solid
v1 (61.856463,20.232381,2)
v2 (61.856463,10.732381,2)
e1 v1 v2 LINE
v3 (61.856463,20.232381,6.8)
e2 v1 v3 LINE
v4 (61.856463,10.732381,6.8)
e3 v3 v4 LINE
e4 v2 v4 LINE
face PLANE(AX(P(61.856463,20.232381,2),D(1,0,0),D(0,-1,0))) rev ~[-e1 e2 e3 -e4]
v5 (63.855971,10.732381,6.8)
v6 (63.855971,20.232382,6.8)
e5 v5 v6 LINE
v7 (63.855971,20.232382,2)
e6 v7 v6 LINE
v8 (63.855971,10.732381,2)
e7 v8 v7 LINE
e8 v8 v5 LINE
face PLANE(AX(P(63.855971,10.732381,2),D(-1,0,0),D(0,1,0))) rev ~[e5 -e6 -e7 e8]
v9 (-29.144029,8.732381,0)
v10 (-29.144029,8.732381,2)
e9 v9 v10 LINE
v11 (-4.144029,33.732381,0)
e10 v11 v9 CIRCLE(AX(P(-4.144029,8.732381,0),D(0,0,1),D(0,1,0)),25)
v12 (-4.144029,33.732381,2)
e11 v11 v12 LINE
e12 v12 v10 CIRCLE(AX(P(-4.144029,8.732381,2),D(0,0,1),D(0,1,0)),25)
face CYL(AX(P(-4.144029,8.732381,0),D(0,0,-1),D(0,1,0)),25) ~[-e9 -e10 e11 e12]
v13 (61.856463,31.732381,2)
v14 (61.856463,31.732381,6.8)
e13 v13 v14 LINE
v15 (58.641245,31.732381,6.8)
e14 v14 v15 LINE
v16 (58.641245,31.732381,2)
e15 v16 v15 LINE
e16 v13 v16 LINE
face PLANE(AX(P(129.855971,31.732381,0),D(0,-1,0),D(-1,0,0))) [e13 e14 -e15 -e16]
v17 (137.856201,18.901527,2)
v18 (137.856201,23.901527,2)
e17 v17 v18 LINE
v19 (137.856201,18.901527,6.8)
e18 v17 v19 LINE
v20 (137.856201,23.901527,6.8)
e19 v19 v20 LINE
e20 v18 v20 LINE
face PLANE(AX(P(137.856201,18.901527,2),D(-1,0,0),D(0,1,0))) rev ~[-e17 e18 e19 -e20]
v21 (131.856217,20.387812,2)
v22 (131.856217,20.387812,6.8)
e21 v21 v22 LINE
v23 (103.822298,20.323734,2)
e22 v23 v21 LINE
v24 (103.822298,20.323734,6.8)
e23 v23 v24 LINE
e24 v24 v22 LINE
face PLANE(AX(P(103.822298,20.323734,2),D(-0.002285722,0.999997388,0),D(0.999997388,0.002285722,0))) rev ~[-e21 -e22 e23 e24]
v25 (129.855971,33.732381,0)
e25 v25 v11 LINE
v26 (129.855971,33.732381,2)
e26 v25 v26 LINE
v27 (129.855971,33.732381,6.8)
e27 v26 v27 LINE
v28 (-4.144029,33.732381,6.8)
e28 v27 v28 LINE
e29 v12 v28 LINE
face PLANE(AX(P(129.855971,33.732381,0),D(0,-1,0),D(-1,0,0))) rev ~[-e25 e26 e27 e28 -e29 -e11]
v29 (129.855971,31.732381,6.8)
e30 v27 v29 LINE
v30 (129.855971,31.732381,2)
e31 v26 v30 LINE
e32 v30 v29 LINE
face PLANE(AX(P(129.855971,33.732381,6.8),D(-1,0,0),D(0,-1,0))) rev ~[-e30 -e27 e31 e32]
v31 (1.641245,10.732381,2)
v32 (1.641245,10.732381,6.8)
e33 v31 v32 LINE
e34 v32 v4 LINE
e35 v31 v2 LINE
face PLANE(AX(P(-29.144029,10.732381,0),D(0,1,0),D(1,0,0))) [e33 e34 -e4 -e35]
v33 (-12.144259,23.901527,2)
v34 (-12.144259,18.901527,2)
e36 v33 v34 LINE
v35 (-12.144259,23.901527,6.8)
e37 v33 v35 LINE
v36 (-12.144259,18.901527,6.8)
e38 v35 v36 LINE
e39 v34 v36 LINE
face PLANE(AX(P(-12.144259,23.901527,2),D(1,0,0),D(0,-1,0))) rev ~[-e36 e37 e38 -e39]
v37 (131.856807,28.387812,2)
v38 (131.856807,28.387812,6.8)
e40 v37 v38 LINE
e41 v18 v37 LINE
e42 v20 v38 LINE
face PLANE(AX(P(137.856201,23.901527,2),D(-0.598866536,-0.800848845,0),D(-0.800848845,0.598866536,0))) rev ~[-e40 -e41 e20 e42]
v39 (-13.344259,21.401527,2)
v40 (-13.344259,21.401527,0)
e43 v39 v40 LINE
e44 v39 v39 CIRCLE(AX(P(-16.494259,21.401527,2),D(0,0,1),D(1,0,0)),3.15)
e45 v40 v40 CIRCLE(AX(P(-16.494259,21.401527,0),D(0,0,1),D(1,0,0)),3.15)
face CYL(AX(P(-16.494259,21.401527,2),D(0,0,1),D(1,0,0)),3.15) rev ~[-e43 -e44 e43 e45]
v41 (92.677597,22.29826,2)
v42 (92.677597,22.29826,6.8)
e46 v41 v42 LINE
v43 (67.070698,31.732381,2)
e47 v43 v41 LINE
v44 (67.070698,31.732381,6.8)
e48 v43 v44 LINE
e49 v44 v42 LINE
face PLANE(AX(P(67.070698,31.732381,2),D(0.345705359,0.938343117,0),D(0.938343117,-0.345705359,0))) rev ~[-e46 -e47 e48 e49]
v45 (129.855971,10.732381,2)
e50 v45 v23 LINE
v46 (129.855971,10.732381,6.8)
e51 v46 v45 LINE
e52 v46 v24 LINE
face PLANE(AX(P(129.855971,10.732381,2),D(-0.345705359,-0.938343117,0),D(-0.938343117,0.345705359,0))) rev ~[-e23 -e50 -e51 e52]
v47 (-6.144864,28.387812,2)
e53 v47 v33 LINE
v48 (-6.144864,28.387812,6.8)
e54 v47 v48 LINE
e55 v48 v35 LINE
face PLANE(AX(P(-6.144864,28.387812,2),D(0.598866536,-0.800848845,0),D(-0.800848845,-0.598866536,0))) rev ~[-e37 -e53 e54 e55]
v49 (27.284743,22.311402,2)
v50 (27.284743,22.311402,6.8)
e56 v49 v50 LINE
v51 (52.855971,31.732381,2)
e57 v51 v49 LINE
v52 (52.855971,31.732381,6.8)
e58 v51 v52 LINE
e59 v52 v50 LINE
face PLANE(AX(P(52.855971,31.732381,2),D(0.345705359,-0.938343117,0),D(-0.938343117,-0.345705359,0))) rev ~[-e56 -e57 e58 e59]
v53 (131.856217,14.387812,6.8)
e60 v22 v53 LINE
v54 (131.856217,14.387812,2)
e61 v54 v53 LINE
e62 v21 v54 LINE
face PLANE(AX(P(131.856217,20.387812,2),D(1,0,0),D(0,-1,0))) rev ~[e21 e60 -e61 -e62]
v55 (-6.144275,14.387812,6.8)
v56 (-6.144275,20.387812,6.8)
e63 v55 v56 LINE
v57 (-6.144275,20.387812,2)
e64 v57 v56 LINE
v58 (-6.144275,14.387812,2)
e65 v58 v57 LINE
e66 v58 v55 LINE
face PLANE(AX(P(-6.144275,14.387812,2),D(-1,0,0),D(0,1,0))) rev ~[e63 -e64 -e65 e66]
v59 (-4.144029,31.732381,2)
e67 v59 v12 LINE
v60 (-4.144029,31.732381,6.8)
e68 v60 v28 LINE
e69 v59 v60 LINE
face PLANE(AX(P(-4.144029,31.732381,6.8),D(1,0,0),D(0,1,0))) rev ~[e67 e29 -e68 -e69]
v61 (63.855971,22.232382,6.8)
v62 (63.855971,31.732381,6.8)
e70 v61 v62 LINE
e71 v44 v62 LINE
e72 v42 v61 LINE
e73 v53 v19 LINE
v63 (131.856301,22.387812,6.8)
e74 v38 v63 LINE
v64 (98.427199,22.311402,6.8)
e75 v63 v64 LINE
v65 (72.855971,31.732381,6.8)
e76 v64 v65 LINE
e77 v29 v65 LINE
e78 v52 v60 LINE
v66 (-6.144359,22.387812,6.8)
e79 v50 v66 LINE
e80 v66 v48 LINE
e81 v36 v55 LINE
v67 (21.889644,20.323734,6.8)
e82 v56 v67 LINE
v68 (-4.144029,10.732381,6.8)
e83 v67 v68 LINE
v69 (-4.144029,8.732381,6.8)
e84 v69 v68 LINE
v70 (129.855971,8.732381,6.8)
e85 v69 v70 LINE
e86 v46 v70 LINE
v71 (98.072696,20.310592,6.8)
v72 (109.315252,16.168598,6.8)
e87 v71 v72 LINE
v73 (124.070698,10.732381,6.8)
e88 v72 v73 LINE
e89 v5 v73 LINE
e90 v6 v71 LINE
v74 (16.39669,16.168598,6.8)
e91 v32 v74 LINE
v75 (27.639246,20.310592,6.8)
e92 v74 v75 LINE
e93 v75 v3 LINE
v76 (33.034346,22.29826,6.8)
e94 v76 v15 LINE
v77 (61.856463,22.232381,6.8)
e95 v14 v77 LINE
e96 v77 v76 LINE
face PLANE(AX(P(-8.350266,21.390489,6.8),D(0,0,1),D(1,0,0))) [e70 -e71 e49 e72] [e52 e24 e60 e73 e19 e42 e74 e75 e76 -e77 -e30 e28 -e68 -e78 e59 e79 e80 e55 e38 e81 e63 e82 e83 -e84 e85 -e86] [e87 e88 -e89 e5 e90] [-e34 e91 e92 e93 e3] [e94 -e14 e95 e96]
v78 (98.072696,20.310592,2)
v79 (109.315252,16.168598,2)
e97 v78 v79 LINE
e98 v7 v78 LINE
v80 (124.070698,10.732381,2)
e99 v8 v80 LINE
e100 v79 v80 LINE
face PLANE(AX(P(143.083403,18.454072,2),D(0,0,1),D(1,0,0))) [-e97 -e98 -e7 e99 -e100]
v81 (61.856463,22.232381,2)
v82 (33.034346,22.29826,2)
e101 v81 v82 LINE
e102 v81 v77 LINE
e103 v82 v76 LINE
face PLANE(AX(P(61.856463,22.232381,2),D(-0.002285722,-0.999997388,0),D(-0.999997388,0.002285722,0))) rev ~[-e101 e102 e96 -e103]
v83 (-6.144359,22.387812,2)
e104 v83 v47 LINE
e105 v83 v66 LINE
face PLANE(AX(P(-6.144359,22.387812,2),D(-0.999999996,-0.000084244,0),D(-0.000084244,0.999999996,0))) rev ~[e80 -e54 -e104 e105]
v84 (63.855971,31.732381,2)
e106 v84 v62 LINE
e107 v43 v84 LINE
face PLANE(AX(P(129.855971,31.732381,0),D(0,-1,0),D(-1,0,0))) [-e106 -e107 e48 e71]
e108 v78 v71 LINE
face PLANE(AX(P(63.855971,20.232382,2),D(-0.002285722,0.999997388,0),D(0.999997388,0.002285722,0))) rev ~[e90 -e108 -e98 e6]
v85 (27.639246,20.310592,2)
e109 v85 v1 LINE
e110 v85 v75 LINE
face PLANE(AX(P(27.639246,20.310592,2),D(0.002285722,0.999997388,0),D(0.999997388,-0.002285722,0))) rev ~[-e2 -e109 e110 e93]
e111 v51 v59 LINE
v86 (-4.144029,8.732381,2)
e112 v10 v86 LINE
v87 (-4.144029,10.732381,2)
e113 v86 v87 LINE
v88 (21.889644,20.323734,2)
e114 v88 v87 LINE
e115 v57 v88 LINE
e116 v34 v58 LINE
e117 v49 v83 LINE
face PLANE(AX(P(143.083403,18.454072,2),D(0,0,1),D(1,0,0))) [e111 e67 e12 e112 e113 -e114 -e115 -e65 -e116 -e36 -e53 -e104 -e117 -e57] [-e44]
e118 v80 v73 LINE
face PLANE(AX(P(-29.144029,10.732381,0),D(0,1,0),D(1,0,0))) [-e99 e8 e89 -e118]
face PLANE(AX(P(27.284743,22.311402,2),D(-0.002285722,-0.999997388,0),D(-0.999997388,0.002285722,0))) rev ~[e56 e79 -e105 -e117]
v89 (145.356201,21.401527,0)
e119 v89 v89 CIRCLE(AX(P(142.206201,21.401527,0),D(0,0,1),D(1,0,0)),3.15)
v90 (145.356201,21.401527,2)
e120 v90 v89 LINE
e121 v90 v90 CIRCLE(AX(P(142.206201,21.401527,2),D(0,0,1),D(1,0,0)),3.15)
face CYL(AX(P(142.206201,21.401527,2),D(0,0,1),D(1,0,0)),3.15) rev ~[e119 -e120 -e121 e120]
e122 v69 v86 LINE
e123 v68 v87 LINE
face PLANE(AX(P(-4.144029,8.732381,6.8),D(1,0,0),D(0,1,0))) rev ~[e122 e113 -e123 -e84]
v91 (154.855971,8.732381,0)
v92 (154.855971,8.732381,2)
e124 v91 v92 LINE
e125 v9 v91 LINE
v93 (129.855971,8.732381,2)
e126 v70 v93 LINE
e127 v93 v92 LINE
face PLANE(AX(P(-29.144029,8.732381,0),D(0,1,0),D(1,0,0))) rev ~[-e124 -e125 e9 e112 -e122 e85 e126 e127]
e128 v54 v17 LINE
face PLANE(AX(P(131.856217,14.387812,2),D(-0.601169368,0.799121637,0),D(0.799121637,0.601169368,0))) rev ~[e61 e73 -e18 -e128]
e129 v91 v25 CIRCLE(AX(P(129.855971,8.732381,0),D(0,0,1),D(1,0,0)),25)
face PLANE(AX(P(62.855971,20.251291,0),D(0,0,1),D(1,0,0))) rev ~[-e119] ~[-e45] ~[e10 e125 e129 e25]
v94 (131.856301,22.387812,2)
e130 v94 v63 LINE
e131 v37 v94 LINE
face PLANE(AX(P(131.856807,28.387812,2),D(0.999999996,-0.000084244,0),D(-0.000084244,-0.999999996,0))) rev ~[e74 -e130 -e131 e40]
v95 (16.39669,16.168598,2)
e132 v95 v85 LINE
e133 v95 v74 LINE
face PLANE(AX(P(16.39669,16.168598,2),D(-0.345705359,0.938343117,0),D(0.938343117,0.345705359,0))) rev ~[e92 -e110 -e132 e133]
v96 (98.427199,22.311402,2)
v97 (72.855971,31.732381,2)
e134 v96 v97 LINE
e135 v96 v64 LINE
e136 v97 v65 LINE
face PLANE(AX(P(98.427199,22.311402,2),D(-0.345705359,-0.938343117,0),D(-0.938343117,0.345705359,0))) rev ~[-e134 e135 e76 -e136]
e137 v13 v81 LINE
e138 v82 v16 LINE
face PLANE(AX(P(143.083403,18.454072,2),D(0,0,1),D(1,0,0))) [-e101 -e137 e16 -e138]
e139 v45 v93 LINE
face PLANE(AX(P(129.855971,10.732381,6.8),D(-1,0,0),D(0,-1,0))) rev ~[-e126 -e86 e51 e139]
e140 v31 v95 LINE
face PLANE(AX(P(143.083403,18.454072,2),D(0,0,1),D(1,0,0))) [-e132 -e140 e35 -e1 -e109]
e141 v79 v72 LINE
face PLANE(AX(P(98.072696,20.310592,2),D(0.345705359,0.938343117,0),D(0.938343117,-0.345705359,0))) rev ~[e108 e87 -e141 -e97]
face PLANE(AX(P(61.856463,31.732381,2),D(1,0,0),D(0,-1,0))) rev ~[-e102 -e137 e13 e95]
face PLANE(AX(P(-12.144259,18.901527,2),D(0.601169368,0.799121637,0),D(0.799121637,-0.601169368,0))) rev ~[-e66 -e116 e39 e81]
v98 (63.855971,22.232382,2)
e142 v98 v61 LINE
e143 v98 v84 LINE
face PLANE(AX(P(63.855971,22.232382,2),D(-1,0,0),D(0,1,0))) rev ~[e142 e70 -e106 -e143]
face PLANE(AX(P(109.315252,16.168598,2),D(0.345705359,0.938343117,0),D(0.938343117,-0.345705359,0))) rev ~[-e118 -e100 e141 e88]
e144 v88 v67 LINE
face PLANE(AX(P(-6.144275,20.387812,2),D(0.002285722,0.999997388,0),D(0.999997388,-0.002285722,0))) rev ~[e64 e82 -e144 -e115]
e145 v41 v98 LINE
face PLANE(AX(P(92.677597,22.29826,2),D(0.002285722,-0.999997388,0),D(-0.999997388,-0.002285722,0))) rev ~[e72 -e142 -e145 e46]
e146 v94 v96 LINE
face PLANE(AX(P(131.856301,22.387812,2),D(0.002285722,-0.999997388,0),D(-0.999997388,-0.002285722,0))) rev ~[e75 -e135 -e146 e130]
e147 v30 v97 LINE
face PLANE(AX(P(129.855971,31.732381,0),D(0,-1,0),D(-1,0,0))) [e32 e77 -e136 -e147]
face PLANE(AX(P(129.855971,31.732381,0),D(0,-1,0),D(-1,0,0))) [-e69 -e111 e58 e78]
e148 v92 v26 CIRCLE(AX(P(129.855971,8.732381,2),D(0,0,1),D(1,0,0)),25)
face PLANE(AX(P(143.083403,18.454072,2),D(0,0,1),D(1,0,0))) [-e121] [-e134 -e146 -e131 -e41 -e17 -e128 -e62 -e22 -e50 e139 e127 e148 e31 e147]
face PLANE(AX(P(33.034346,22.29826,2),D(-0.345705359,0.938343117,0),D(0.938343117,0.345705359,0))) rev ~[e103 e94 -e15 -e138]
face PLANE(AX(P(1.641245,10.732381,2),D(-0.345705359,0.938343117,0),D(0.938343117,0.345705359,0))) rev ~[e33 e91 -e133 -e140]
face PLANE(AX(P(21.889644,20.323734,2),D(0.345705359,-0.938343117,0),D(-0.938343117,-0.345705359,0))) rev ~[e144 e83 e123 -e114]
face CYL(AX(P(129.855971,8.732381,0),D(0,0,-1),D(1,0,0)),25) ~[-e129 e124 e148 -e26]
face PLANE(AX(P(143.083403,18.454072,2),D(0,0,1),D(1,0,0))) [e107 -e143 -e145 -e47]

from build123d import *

# Parameters (mm, degrees)
F1_DEPTH = 6.8
F2_T     = -2
F4_DEPTH = 4.8
F6_DEPTH = 4.8
F5_R     = 3.15
F7_DEPTH = 2


# Not quite as in the source:
# - a feature names something its author has since deleted; it is built from what else it names


with BuildPart() as f1:
    # F0 (on Top) → F1 (new body)
    with BuildSketch(Plane.XY):
        with BuildLine():
            Line((129.8559711718, 33.7323809788), (-4.1440288282, 33.7323809788))
            ThreePointArc((-4.1440288282, 33.7323809788), (-21.8216983579, 26.4100505084), (-29.1440288282, 8.7323809788))
            Line((-29.1440288282, 8.7323809788), (154.8559711718, 8.7323809788))
            ThreePointArc((154.8559711718, 8.7323809788), (147.5336407015, 26.4100505084), (129.8559711718, 33.7323809788))
        make_face()
    extrude(amount=F1_DEPTH)

    # F2
    f2_openings = [f1.faces().sort_by_distance(p)[0] for p in [
        (62.855971, 20.804106, 6.8),
    ]]
    offset(amount=F2_T, openings=f2_openings)

    # F3 (on face) → F4 (cut)
    with BuildSketch(Plane.XY.offset(6.8)):
        with BuildLine():
            Line((-4.1440288282, 8.7323809788), (-4.1440288282, 10.7323809788))
            Line((-4.1440288282, 10.7323809788), (-27.056907303, 10.7323809788))
            ThreePointArc((-27.056907303, 10.7323809788), (-19.6842990961, 25.6882059366), (-4.1440288282, 31.7323809788))
            Line((-4.1440288282, 31.7323809788), (-4.1440288282, 33.7323809788))
            ThreePointArc((-4.1440288282, 33.7323809788), (-21.8216983579, 26.4100505084), (-29.1440288282, 8.7323809788))
            Line((-29.1440288282, 8.7323809788), (-4.1440288282, 8.7323809788))
        make_face()
        with BuildLine():
            Line((152.7688496466, 10.7323809788), (129.8559711718, 10.7323809788))
            Line((129.8559711718, 10.7323809788), (129.8559711718, 8.7323809788))
            Line((129.8559711718, 8.7323809788), (154.8559711718, 8.7323809788))
            ThreePointArc((154.8559711718, 8.7323809788), (147.5336407015, 26.4100505084), (129.8559711718, 33.7323809788))
            Line((129.8559711718, 33.7323809788), (129.8559711718, 31.7323809788))
            ThreePointArc((129.8559711718, 31.7323809788), (145.3962414397, 25.6882059366), (152.7688496466, 10.7323809788))
        make_face()
    extrude(amount=-F4_DEPTH, mode=Mode.SUBTRACT)

    # F5 (on face) → F6 (join)
    with BuildSketch(Plane.XY.offset(2)):
        Polygon((-6.1442747528, 21.3878121691), (-6.144358997, 22.3878121656), (-6.1448644621, 28.3878121443), (-12.1442590792, 23.9015265012), (-12.1442590792, 21.4015265012), (-12.1442590792, 18.9015265012), (-6.1442747528, 14.3878121691), (-6.1442747528, 20.3878121691), align=None)
        Polygon((21.8896443518, 20.3237342556), (27.2847434124, 22.3114023306), (-6.144358997, 22.3878121656), (-6.1442747528, 21.3878121691), (-6.1442747528, 20.3878121691), align=None)
        Polygon((-4.1440288282, 10.7323809788), (1.6412445236, 10.7323809788), (16.3966900356, 16.1685977463), (27.6392464887, 20.3105922291), (21.8896443518, 20.3237342556), align=None)
        Polygon((32.9729093256, 22.2756259058), (33.0343455494, 22.298260304), (27.2847434124, 22.3114023306), (21.8896443518, 20.3237342556), (27.6392464887, 20.3105922291), align=None)
        Polygon((33.0343455494, 22.298260304), (58.6412445236, 31.7323809788), (54.8559711718, 31.7323809788), (52.8559711718, 31.7323809788), (27.2847434124, 22.3114023306), align=None)
        Polygon((61.8564633663, 20.2323809788), (61.8564633663, 22.2323807827), (33.0343455494, 22.298260304), (32.9729093256, 22.2756259058), (27.6392464887, 20.3105922291), align=None)
        Polygon((62.8559711718, 10.7323809788), (62.8559711718, 31.7323809788), (61.8564633663, 31.7323809788), (61.8564633663, 22.2323807827), (61.8564633663, 20.2323809788), (61.8564633663, 10.7323809788), align=None)
        Polygon((92.6775967943, 22.298260304), (63.8559711718, 22.2323819077), (63.8559711718, 20.2323821038), (98.0726958549, 20.3105922291), (92.7390330181, 22.2756259058), align=None)
        Polygon((72.8559711718, 31.7323809788), (67.07069782, 31.7323809788), (92.6775967943, 22.298260304), (98.4271989312, 22.3114023306), align=None)
        Polygon((98.4271989312, 22.3114023306), (92.6775967943, 22.298260304), (92.7390330181, 22.2756259058), (98.0726958549, 20.3105922291), (103.8222979918, 20.3237342556), align=None)
        Polygon((109.3152523081, 16.1685977463), (124.07069782, 10.7323809788), (129.8559711718, 10.7323809788), (103.8222979918, 20.3237342556), (98.0726958549, 20.3105922291), align=None)
        Polygon((131.8563013406, 22.3878121656), (98.4271989312, 22.3114023306), (103.8222979918, 20.3237342556), (131.8562170965, 20.3878121691), (131.8562170965, 21.3878121691), align=None)
        Polygon((131.8568068057, 28.3878121443), (131.8563013406, 22.3878121656), (131.8562170965, 21.3878121691), (131.8562170965, 20.3878121691), (131.8562170965, 14.3878121691), (137.8562014229, 18.9015265012), (137.8562014229, 21.4015265012), (137.8562014229, 23.9015265012), align=None)
        Polygon((63.8559711718, 31.7323809788), (62.8559711718, 31.7323809788), (62.8559711718, 10.7323809788), (63.8559711718, 10.7323809788), (63.8559711718, 20.2323821038), (63.8559711718, 22.2323819077), align=None)
    extrude(amount=F6_DEPTH)

    # F5 (on face) → F7 (cut)
    with BuildSketch(Plane.XY.offset(2)):
        with Locations((-16.4942590792, 21.4015265012)):
            Circle(F5_R)
        with Locations((142.2062014229, 21.4015265012)):
            Circle(F5_R)
    extrude(amount=-F7_DEPTH, mode=Mode.SUBTRACT)


solid = f1.part
